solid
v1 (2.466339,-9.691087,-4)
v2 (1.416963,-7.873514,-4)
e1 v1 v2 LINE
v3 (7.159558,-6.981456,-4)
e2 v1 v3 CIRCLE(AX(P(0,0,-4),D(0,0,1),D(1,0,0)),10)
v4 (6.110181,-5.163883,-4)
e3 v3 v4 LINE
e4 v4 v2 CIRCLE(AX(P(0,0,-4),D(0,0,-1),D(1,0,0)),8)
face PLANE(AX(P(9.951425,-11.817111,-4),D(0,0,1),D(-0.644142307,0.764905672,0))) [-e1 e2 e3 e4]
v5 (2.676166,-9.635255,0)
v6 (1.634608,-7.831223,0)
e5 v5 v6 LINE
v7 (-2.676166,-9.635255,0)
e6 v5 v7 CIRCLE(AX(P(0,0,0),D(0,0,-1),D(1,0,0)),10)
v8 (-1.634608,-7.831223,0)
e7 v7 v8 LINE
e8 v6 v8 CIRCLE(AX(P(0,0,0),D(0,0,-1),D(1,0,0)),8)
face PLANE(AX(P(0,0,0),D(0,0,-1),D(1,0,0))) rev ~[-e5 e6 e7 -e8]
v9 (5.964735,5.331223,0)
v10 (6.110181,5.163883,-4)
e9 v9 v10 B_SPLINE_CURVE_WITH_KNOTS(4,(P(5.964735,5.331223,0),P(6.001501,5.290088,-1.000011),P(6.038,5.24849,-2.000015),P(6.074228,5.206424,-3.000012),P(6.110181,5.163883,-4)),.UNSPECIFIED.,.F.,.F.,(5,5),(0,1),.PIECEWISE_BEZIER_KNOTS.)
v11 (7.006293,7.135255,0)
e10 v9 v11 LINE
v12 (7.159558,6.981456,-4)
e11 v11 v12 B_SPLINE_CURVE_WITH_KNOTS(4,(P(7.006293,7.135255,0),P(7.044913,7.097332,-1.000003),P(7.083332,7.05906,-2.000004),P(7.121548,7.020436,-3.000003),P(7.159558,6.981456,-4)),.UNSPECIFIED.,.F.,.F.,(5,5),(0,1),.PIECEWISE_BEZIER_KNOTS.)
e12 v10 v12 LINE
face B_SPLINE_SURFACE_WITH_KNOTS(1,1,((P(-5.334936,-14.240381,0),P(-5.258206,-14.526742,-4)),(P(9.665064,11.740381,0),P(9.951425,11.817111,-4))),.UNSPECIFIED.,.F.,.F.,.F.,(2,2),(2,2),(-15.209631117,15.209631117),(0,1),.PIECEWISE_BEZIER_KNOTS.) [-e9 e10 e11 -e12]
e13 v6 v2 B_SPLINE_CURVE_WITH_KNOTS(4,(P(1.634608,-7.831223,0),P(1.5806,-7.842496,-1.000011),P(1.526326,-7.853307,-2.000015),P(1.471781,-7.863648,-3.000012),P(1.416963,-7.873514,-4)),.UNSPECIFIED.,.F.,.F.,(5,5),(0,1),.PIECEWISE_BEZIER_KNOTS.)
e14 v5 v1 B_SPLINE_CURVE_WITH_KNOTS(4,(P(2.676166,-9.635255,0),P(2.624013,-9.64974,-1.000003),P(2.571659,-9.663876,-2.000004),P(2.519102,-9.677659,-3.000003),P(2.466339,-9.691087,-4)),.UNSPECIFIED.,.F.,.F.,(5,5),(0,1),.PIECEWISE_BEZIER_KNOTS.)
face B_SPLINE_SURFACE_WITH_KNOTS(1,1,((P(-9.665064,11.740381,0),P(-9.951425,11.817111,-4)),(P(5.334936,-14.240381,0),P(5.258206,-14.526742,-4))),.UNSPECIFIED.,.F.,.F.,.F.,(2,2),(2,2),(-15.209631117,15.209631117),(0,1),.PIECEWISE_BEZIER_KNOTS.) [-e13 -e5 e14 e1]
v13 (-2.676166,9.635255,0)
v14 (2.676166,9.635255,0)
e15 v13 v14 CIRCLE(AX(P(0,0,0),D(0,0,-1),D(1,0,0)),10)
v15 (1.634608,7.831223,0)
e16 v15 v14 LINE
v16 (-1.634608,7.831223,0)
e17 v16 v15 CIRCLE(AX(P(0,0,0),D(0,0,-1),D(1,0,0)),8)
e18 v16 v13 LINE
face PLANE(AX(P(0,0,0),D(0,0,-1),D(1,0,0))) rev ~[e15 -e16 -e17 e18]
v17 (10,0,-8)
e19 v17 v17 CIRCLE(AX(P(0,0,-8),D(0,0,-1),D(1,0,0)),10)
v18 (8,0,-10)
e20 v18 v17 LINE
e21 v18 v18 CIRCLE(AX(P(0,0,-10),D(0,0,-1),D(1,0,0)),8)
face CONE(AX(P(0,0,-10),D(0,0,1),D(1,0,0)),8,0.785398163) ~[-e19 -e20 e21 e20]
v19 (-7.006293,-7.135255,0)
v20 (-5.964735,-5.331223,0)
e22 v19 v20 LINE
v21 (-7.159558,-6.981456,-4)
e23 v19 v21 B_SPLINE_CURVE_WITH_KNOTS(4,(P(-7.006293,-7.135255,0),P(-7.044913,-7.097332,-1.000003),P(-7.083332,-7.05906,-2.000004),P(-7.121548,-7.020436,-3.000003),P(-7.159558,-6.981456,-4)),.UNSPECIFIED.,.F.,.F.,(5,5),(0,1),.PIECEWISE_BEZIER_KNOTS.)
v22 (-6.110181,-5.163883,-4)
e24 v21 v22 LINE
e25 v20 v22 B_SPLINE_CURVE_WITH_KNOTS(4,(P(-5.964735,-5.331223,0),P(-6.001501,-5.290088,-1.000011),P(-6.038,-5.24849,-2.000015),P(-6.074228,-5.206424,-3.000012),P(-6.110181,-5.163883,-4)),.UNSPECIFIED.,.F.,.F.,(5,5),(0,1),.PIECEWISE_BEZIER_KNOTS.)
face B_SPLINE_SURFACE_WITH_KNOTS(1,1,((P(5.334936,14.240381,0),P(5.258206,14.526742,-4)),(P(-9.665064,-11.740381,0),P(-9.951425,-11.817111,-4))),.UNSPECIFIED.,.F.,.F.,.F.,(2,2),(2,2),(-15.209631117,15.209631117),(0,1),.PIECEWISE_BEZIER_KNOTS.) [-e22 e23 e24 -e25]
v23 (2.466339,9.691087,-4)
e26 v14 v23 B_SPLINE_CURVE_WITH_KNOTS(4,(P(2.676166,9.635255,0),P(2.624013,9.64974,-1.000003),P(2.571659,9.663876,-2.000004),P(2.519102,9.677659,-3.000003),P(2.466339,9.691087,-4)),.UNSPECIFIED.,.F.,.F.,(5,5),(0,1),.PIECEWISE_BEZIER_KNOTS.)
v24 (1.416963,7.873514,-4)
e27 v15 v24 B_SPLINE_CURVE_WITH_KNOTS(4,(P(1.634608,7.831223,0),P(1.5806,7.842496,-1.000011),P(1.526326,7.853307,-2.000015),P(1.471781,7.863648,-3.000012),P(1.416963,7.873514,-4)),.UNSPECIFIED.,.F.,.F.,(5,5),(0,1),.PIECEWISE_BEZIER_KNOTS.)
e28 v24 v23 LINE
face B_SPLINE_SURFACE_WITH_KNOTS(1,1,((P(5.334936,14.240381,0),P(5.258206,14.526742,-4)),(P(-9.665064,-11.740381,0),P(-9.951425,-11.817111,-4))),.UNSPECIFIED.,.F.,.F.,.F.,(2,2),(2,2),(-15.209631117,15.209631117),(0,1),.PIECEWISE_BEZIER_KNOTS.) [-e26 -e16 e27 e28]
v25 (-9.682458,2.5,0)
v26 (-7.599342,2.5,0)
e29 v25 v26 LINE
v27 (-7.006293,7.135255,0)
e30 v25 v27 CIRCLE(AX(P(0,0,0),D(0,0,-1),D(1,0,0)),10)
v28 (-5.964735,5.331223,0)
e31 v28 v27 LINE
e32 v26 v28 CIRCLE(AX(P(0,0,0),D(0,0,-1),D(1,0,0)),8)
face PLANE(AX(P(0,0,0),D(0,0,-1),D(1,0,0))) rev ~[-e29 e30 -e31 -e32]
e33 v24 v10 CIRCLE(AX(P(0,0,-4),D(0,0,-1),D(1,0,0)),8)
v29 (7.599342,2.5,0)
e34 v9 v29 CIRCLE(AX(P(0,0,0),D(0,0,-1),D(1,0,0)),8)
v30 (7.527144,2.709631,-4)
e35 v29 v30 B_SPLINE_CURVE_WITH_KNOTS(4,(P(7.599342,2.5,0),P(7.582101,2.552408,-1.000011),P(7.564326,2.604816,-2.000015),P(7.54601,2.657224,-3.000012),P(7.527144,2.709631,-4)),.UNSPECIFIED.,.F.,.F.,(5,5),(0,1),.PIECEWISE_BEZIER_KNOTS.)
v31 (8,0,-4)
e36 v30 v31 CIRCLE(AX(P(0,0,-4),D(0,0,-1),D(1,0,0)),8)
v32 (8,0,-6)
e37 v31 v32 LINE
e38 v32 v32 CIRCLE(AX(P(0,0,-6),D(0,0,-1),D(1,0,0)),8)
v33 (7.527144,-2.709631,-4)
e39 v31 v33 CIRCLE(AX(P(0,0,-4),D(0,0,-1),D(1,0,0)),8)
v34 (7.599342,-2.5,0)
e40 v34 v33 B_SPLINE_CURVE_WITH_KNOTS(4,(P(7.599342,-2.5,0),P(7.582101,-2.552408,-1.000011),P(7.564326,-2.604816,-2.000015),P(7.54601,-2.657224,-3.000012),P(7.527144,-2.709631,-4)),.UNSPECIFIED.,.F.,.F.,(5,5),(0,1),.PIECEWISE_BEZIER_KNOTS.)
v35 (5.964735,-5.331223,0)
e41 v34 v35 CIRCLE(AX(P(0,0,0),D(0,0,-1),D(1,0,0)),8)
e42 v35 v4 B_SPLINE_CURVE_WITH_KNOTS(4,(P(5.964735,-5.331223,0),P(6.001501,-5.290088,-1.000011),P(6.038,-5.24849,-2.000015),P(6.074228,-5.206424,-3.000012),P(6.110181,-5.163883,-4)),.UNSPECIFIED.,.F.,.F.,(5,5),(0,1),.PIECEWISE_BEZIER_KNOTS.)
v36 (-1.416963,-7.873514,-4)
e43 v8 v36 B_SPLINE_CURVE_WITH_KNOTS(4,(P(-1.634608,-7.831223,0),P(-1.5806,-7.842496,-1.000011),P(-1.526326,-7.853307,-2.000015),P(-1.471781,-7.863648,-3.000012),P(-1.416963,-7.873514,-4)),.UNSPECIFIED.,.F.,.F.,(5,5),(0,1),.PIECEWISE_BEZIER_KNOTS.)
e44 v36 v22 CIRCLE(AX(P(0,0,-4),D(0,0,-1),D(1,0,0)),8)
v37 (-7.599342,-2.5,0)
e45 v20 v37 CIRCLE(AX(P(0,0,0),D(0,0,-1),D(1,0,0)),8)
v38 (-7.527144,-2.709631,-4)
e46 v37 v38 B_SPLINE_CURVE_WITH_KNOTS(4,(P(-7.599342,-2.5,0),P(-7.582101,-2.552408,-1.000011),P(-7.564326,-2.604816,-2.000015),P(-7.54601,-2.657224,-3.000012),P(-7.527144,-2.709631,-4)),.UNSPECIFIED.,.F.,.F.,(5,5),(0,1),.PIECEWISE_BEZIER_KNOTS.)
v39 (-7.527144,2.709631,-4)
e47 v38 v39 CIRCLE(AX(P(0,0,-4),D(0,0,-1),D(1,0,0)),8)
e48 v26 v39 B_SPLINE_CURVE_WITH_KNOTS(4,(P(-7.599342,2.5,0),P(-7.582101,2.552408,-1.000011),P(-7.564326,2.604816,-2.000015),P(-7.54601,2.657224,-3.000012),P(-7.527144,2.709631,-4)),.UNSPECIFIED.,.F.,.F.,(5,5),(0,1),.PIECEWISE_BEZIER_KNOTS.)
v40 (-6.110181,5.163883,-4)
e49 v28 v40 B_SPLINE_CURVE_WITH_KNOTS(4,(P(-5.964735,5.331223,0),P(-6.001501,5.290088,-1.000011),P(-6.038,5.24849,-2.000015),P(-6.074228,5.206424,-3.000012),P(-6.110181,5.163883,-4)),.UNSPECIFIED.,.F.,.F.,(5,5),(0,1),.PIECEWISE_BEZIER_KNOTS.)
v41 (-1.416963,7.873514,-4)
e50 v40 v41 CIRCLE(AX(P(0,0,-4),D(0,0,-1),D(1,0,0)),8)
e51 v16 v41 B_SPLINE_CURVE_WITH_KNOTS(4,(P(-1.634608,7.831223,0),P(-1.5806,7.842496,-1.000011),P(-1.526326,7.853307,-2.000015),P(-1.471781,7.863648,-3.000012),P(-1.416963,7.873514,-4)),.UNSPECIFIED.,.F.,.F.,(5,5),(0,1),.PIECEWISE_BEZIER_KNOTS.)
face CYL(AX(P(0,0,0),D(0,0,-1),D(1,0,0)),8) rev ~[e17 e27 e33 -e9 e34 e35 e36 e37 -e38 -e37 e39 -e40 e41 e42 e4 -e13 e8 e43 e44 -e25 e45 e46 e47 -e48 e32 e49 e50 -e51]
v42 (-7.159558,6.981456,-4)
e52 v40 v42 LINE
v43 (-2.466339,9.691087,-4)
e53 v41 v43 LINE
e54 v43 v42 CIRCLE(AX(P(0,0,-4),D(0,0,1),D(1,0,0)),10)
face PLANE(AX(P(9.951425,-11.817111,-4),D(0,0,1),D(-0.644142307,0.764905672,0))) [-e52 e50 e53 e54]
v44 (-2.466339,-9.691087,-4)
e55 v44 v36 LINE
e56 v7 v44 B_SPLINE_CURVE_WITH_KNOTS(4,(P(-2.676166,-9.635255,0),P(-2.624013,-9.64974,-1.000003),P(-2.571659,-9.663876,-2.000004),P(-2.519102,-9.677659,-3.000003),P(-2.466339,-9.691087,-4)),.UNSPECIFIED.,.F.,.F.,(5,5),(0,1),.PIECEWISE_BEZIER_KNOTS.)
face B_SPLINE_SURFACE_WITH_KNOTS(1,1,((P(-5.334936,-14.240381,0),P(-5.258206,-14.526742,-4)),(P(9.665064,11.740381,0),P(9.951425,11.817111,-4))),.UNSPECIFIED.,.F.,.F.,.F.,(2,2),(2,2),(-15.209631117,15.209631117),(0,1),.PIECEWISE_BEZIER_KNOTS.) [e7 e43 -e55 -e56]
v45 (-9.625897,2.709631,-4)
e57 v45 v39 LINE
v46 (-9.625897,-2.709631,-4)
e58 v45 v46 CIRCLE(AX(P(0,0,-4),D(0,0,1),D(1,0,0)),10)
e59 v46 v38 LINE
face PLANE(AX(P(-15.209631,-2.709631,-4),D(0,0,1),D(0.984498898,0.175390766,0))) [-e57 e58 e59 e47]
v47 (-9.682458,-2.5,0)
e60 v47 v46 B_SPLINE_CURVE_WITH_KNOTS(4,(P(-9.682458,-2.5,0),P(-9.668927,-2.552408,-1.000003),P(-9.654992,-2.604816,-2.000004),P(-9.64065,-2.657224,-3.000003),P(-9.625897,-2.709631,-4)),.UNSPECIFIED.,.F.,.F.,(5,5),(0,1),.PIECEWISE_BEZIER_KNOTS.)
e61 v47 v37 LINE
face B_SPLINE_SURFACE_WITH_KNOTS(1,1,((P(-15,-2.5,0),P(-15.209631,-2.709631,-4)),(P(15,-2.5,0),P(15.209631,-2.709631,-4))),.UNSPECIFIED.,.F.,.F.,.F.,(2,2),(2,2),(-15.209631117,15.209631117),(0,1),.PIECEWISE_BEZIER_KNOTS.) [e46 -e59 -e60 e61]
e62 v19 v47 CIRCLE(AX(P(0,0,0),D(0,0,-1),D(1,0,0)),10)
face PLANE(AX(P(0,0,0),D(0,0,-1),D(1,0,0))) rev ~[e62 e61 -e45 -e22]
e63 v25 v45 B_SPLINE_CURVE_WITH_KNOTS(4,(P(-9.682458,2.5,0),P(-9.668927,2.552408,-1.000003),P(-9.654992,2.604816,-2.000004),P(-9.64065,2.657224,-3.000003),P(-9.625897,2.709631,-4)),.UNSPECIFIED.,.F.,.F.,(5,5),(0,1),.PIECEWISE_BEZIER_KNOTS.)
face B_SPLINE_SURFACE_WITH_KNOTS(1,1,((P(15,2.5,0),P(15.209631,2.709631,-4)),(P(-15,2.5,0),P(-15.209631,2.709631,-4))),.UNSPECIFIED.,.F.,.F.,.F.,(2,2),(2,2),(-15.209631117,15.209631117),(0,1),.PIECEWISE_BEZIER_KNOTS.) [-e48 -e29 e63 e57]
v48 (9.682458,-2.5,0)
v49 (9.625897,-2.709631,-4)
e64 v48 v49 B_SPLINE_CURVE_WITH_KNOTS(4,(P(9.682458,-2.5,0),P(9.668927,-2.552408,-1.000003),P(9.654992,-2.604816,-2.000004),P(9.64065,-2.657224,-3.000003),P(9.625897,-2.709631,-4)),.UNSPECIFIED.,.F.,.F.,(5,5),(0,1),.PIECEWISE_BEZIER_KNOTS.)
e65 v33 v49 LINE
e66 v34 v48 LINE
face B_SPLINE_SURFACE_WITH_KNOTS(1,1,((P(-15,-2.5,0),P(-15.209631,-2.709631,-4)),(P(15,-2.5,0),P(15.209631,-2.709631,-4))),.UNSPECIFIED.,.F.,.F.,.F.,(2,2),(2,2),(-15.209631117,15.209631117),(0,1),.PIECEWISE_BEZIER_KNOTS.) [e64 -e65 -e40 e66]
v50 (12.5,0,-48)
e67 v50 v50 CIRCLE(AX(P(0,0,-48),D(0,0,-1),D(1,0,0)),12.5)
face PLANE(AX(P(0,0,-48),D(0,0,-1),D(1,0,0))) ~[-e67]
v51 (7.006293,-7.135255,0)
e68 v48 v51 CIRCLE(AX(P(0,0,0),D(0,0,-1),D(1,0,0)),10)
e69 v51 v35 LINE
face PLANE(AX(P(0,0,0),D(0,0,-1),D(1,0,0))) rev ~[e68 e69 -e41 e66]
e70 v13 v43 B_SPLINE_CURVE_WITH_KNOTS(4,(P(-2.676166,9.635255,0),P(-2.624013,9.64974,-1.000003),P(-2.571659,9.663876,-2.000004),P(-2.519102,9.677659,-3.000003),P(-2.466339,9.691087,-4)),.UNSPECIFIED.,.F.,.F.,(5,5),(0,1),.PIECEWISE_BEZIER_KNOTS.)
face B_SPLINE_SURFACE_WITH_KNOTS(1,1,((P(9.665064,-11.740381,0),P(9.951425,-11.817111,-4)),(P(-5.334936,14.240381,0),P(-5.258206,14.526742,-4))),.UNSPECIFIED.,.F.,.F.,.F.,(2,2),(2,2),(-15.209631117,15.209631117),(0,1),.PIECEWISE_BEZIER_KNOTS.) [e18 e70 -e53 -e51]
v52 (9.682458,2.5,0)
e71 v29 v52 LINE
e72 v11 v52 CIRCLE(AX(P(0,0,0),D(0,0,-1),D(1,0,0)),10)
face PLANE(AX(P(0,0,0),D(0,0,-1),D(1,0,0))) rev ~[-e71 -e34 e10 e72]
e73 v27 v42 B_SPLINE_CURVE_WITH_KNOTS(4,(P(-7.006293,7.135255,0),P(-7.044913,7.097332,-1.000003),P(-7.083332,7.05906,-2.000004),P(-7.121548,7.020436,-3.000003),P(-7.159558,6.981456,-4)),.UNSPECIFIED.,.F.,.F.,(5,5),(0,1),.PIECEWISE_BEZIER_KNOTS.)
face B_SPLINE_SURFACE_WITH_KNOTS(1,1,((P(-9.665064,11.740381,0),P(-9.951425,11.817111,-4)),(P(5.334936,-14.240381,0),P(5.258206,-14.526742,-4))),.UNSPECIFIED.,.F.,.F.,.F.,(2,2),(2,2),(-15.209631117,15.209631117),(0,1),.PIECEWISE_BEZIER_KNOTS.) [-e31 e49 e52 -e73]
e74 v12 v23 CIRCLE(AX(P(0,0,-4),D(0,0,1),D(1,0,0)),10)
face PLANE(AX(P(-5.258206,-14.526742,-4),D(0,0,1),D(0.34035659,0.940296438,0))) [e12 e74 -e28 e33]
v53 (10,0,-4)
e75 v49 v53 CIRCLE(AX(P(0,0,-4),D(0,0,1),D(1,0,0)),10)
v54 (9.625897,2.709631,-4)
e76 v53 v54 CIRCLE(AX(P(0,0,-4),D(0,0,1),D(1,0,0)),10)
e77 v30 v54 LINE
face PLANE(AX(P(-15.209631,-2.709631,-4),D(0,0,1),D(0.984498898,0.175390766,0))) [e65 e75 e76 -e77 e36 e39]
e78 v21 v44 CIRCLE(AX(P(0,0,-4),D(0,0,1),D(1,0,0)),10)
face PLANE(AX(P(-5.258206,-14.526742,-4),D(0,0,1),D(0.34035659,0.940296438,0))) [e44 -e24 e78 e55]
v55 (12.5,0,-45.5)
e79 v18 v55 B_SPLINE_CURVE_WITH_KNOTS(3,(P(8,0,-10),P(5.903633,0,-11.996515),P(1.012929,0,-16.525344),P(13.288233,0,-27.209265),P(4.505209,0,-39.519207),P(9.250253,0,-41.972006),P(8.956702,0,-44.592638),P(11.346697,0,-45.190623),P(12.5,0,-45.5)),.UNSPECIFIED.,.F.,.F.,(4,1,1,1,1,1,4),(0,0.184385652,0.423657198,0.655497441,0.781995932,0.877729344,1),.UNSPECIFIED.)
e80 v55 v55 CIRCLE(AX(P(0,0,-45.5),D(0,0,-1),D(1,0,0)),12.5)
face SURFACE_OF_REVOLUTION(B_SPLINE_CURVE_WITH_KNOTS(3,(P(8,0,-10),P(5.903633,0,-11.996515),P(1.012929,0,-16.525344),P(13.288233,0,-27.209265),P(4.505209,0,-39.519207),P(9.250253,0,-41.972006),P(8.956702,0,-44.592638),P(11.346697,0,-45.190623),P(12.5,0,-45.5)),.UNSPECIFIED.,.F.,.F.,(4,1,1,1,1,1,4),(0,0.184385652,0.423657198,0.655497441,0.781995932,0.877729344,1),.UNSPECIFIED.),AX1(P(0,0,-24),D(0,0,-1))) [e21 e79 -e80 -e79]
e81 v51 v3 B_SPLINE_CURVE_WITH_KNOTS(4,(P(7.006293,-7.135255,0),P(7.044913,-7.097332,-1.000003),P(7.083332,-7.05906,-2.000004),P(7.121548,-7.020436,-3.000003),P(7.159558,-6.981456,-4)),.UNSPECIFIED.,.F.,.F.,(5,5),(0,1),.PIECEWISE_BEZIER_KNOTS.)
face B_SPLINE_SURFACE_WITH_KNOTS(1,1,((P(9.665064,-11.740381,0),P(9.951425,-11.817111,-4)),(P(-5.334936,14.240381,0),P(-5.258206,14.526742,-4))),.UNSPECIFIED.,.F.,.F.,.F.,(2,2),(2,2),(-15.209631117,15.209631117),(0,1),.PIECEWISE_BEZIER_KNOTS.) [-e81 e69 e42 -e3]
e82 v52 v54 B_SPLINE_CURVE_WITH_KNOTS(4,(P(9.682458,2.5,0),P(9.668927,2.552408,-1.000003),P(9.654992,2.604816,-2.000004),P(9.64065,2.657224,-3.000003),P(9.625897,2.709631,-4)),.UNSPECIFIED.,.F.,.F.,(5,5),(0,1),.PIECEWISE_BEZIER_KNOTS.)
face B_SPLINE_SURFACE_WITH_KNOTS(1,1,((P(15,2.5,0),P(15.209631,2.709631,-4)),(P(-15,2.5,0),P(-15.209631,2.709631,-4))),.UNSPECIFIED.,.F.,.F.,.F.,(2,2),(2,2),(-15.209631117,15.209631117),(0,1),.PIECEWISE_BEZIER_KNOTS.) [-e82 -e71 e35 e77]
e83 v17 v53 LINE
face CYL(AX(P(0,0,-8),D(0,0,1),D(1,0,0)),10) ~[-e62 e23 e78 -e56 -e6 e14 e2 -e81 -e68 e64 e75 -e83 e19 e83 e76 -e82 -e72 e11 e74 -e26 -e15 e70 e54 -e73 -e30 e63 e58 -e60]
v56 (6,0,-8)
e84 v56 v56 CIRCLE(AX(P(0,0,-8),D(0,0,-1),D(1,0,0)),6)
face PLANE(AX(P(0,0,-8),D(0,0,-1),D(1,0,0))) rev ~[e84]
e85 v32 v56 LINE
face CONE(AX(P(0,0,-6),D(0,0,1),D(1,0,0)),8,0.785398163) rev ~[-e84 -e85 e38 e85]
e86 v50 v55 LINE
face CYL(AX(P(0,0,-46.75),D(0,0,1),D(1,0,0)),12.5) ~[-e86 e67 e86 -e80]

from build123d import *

# Parameters (mm, degrees)
F0_W            = 12.5
F0_H            = 2.5
F2_W            = 30
F2_H            = 5
F3_DEPTH        = 4
F3_TAPER        = -3
F3_COPIES_COUNT = 3
F3_COPIES_ANGLE = 120
F4_SIZE         = 2


# Not quite as in the source:
# - a pattern or mirror of a feature is missing from the dataset's text; its kind, count and spacing are read off the source's solid


with BuildPart() as f1:
    # F0 (on Front) → F1 (revolve)
    with BuildSketch(Plane.XZ):
        Polygon((10, 0), (8, 0), (8, -8), (0, -8), (0, -10), (8, -10), (10, -8), align=None)
        with BuildLine():
            Line((8, -10), (0, -10))
            Line((0, -10), (0, -45.5))
            Line((0, -45.5), (12.5, -45.5))
            add(Edge.make_bspline(
                [(8, -10), (5.9036325589, -11.9965153095), (1.0129290603, -16.5253438832), (13.2882333552, -27.2092652156), (4.5052088966, -39.5192070851), (9.2502525397, -41.9720056367), (8.9567015183, -44.5926383173), (11.3466967049, -45.1906230325), (12.5, -45.5)],
                knots=[0, 0, 0, 0, 0.1843856525, 0.4236571978, 0.6554974409, 0.7819959318, 0.8777293444, 1, 1, 1, 1], degree=3))
        make_face()
        with Locations((6.25, -46.75)):
            Rectangle(F0_W, F0_H)
    revolve(axis=Axis((0, 0, -24), (0, 0, -1)))

    # F2 (on face) → F3 (cut)
    with BuildSketch(Plane.XY):
        Rectangle(F2_W, F2_H)
    f3 = extrude(amount=-F3_DEPTH, taper=F3_TAPER, mode=Mode.SUBTRACT)

    # F3_copies: F3 ×3 about axis
    f3_copies_axis = Axis((0, 0, 0), (0, 0, 1))
    for i in range(1, F3_COPIES_COUNT):
        add(f3.rotate(f3_copies_axis, i * F3_COPIES_ANGLE / (F3_COPIES_COUNT - 1)), mode=Mode.SUBTRACT)

    # F4
    f4_edges = [f1.edges().sort_by_distance(p)[0] for p in [
        (-8, 0, -8),
    ]]
    chamfer(f4_edges, length=F4_SIZE)


solid = f1.part
